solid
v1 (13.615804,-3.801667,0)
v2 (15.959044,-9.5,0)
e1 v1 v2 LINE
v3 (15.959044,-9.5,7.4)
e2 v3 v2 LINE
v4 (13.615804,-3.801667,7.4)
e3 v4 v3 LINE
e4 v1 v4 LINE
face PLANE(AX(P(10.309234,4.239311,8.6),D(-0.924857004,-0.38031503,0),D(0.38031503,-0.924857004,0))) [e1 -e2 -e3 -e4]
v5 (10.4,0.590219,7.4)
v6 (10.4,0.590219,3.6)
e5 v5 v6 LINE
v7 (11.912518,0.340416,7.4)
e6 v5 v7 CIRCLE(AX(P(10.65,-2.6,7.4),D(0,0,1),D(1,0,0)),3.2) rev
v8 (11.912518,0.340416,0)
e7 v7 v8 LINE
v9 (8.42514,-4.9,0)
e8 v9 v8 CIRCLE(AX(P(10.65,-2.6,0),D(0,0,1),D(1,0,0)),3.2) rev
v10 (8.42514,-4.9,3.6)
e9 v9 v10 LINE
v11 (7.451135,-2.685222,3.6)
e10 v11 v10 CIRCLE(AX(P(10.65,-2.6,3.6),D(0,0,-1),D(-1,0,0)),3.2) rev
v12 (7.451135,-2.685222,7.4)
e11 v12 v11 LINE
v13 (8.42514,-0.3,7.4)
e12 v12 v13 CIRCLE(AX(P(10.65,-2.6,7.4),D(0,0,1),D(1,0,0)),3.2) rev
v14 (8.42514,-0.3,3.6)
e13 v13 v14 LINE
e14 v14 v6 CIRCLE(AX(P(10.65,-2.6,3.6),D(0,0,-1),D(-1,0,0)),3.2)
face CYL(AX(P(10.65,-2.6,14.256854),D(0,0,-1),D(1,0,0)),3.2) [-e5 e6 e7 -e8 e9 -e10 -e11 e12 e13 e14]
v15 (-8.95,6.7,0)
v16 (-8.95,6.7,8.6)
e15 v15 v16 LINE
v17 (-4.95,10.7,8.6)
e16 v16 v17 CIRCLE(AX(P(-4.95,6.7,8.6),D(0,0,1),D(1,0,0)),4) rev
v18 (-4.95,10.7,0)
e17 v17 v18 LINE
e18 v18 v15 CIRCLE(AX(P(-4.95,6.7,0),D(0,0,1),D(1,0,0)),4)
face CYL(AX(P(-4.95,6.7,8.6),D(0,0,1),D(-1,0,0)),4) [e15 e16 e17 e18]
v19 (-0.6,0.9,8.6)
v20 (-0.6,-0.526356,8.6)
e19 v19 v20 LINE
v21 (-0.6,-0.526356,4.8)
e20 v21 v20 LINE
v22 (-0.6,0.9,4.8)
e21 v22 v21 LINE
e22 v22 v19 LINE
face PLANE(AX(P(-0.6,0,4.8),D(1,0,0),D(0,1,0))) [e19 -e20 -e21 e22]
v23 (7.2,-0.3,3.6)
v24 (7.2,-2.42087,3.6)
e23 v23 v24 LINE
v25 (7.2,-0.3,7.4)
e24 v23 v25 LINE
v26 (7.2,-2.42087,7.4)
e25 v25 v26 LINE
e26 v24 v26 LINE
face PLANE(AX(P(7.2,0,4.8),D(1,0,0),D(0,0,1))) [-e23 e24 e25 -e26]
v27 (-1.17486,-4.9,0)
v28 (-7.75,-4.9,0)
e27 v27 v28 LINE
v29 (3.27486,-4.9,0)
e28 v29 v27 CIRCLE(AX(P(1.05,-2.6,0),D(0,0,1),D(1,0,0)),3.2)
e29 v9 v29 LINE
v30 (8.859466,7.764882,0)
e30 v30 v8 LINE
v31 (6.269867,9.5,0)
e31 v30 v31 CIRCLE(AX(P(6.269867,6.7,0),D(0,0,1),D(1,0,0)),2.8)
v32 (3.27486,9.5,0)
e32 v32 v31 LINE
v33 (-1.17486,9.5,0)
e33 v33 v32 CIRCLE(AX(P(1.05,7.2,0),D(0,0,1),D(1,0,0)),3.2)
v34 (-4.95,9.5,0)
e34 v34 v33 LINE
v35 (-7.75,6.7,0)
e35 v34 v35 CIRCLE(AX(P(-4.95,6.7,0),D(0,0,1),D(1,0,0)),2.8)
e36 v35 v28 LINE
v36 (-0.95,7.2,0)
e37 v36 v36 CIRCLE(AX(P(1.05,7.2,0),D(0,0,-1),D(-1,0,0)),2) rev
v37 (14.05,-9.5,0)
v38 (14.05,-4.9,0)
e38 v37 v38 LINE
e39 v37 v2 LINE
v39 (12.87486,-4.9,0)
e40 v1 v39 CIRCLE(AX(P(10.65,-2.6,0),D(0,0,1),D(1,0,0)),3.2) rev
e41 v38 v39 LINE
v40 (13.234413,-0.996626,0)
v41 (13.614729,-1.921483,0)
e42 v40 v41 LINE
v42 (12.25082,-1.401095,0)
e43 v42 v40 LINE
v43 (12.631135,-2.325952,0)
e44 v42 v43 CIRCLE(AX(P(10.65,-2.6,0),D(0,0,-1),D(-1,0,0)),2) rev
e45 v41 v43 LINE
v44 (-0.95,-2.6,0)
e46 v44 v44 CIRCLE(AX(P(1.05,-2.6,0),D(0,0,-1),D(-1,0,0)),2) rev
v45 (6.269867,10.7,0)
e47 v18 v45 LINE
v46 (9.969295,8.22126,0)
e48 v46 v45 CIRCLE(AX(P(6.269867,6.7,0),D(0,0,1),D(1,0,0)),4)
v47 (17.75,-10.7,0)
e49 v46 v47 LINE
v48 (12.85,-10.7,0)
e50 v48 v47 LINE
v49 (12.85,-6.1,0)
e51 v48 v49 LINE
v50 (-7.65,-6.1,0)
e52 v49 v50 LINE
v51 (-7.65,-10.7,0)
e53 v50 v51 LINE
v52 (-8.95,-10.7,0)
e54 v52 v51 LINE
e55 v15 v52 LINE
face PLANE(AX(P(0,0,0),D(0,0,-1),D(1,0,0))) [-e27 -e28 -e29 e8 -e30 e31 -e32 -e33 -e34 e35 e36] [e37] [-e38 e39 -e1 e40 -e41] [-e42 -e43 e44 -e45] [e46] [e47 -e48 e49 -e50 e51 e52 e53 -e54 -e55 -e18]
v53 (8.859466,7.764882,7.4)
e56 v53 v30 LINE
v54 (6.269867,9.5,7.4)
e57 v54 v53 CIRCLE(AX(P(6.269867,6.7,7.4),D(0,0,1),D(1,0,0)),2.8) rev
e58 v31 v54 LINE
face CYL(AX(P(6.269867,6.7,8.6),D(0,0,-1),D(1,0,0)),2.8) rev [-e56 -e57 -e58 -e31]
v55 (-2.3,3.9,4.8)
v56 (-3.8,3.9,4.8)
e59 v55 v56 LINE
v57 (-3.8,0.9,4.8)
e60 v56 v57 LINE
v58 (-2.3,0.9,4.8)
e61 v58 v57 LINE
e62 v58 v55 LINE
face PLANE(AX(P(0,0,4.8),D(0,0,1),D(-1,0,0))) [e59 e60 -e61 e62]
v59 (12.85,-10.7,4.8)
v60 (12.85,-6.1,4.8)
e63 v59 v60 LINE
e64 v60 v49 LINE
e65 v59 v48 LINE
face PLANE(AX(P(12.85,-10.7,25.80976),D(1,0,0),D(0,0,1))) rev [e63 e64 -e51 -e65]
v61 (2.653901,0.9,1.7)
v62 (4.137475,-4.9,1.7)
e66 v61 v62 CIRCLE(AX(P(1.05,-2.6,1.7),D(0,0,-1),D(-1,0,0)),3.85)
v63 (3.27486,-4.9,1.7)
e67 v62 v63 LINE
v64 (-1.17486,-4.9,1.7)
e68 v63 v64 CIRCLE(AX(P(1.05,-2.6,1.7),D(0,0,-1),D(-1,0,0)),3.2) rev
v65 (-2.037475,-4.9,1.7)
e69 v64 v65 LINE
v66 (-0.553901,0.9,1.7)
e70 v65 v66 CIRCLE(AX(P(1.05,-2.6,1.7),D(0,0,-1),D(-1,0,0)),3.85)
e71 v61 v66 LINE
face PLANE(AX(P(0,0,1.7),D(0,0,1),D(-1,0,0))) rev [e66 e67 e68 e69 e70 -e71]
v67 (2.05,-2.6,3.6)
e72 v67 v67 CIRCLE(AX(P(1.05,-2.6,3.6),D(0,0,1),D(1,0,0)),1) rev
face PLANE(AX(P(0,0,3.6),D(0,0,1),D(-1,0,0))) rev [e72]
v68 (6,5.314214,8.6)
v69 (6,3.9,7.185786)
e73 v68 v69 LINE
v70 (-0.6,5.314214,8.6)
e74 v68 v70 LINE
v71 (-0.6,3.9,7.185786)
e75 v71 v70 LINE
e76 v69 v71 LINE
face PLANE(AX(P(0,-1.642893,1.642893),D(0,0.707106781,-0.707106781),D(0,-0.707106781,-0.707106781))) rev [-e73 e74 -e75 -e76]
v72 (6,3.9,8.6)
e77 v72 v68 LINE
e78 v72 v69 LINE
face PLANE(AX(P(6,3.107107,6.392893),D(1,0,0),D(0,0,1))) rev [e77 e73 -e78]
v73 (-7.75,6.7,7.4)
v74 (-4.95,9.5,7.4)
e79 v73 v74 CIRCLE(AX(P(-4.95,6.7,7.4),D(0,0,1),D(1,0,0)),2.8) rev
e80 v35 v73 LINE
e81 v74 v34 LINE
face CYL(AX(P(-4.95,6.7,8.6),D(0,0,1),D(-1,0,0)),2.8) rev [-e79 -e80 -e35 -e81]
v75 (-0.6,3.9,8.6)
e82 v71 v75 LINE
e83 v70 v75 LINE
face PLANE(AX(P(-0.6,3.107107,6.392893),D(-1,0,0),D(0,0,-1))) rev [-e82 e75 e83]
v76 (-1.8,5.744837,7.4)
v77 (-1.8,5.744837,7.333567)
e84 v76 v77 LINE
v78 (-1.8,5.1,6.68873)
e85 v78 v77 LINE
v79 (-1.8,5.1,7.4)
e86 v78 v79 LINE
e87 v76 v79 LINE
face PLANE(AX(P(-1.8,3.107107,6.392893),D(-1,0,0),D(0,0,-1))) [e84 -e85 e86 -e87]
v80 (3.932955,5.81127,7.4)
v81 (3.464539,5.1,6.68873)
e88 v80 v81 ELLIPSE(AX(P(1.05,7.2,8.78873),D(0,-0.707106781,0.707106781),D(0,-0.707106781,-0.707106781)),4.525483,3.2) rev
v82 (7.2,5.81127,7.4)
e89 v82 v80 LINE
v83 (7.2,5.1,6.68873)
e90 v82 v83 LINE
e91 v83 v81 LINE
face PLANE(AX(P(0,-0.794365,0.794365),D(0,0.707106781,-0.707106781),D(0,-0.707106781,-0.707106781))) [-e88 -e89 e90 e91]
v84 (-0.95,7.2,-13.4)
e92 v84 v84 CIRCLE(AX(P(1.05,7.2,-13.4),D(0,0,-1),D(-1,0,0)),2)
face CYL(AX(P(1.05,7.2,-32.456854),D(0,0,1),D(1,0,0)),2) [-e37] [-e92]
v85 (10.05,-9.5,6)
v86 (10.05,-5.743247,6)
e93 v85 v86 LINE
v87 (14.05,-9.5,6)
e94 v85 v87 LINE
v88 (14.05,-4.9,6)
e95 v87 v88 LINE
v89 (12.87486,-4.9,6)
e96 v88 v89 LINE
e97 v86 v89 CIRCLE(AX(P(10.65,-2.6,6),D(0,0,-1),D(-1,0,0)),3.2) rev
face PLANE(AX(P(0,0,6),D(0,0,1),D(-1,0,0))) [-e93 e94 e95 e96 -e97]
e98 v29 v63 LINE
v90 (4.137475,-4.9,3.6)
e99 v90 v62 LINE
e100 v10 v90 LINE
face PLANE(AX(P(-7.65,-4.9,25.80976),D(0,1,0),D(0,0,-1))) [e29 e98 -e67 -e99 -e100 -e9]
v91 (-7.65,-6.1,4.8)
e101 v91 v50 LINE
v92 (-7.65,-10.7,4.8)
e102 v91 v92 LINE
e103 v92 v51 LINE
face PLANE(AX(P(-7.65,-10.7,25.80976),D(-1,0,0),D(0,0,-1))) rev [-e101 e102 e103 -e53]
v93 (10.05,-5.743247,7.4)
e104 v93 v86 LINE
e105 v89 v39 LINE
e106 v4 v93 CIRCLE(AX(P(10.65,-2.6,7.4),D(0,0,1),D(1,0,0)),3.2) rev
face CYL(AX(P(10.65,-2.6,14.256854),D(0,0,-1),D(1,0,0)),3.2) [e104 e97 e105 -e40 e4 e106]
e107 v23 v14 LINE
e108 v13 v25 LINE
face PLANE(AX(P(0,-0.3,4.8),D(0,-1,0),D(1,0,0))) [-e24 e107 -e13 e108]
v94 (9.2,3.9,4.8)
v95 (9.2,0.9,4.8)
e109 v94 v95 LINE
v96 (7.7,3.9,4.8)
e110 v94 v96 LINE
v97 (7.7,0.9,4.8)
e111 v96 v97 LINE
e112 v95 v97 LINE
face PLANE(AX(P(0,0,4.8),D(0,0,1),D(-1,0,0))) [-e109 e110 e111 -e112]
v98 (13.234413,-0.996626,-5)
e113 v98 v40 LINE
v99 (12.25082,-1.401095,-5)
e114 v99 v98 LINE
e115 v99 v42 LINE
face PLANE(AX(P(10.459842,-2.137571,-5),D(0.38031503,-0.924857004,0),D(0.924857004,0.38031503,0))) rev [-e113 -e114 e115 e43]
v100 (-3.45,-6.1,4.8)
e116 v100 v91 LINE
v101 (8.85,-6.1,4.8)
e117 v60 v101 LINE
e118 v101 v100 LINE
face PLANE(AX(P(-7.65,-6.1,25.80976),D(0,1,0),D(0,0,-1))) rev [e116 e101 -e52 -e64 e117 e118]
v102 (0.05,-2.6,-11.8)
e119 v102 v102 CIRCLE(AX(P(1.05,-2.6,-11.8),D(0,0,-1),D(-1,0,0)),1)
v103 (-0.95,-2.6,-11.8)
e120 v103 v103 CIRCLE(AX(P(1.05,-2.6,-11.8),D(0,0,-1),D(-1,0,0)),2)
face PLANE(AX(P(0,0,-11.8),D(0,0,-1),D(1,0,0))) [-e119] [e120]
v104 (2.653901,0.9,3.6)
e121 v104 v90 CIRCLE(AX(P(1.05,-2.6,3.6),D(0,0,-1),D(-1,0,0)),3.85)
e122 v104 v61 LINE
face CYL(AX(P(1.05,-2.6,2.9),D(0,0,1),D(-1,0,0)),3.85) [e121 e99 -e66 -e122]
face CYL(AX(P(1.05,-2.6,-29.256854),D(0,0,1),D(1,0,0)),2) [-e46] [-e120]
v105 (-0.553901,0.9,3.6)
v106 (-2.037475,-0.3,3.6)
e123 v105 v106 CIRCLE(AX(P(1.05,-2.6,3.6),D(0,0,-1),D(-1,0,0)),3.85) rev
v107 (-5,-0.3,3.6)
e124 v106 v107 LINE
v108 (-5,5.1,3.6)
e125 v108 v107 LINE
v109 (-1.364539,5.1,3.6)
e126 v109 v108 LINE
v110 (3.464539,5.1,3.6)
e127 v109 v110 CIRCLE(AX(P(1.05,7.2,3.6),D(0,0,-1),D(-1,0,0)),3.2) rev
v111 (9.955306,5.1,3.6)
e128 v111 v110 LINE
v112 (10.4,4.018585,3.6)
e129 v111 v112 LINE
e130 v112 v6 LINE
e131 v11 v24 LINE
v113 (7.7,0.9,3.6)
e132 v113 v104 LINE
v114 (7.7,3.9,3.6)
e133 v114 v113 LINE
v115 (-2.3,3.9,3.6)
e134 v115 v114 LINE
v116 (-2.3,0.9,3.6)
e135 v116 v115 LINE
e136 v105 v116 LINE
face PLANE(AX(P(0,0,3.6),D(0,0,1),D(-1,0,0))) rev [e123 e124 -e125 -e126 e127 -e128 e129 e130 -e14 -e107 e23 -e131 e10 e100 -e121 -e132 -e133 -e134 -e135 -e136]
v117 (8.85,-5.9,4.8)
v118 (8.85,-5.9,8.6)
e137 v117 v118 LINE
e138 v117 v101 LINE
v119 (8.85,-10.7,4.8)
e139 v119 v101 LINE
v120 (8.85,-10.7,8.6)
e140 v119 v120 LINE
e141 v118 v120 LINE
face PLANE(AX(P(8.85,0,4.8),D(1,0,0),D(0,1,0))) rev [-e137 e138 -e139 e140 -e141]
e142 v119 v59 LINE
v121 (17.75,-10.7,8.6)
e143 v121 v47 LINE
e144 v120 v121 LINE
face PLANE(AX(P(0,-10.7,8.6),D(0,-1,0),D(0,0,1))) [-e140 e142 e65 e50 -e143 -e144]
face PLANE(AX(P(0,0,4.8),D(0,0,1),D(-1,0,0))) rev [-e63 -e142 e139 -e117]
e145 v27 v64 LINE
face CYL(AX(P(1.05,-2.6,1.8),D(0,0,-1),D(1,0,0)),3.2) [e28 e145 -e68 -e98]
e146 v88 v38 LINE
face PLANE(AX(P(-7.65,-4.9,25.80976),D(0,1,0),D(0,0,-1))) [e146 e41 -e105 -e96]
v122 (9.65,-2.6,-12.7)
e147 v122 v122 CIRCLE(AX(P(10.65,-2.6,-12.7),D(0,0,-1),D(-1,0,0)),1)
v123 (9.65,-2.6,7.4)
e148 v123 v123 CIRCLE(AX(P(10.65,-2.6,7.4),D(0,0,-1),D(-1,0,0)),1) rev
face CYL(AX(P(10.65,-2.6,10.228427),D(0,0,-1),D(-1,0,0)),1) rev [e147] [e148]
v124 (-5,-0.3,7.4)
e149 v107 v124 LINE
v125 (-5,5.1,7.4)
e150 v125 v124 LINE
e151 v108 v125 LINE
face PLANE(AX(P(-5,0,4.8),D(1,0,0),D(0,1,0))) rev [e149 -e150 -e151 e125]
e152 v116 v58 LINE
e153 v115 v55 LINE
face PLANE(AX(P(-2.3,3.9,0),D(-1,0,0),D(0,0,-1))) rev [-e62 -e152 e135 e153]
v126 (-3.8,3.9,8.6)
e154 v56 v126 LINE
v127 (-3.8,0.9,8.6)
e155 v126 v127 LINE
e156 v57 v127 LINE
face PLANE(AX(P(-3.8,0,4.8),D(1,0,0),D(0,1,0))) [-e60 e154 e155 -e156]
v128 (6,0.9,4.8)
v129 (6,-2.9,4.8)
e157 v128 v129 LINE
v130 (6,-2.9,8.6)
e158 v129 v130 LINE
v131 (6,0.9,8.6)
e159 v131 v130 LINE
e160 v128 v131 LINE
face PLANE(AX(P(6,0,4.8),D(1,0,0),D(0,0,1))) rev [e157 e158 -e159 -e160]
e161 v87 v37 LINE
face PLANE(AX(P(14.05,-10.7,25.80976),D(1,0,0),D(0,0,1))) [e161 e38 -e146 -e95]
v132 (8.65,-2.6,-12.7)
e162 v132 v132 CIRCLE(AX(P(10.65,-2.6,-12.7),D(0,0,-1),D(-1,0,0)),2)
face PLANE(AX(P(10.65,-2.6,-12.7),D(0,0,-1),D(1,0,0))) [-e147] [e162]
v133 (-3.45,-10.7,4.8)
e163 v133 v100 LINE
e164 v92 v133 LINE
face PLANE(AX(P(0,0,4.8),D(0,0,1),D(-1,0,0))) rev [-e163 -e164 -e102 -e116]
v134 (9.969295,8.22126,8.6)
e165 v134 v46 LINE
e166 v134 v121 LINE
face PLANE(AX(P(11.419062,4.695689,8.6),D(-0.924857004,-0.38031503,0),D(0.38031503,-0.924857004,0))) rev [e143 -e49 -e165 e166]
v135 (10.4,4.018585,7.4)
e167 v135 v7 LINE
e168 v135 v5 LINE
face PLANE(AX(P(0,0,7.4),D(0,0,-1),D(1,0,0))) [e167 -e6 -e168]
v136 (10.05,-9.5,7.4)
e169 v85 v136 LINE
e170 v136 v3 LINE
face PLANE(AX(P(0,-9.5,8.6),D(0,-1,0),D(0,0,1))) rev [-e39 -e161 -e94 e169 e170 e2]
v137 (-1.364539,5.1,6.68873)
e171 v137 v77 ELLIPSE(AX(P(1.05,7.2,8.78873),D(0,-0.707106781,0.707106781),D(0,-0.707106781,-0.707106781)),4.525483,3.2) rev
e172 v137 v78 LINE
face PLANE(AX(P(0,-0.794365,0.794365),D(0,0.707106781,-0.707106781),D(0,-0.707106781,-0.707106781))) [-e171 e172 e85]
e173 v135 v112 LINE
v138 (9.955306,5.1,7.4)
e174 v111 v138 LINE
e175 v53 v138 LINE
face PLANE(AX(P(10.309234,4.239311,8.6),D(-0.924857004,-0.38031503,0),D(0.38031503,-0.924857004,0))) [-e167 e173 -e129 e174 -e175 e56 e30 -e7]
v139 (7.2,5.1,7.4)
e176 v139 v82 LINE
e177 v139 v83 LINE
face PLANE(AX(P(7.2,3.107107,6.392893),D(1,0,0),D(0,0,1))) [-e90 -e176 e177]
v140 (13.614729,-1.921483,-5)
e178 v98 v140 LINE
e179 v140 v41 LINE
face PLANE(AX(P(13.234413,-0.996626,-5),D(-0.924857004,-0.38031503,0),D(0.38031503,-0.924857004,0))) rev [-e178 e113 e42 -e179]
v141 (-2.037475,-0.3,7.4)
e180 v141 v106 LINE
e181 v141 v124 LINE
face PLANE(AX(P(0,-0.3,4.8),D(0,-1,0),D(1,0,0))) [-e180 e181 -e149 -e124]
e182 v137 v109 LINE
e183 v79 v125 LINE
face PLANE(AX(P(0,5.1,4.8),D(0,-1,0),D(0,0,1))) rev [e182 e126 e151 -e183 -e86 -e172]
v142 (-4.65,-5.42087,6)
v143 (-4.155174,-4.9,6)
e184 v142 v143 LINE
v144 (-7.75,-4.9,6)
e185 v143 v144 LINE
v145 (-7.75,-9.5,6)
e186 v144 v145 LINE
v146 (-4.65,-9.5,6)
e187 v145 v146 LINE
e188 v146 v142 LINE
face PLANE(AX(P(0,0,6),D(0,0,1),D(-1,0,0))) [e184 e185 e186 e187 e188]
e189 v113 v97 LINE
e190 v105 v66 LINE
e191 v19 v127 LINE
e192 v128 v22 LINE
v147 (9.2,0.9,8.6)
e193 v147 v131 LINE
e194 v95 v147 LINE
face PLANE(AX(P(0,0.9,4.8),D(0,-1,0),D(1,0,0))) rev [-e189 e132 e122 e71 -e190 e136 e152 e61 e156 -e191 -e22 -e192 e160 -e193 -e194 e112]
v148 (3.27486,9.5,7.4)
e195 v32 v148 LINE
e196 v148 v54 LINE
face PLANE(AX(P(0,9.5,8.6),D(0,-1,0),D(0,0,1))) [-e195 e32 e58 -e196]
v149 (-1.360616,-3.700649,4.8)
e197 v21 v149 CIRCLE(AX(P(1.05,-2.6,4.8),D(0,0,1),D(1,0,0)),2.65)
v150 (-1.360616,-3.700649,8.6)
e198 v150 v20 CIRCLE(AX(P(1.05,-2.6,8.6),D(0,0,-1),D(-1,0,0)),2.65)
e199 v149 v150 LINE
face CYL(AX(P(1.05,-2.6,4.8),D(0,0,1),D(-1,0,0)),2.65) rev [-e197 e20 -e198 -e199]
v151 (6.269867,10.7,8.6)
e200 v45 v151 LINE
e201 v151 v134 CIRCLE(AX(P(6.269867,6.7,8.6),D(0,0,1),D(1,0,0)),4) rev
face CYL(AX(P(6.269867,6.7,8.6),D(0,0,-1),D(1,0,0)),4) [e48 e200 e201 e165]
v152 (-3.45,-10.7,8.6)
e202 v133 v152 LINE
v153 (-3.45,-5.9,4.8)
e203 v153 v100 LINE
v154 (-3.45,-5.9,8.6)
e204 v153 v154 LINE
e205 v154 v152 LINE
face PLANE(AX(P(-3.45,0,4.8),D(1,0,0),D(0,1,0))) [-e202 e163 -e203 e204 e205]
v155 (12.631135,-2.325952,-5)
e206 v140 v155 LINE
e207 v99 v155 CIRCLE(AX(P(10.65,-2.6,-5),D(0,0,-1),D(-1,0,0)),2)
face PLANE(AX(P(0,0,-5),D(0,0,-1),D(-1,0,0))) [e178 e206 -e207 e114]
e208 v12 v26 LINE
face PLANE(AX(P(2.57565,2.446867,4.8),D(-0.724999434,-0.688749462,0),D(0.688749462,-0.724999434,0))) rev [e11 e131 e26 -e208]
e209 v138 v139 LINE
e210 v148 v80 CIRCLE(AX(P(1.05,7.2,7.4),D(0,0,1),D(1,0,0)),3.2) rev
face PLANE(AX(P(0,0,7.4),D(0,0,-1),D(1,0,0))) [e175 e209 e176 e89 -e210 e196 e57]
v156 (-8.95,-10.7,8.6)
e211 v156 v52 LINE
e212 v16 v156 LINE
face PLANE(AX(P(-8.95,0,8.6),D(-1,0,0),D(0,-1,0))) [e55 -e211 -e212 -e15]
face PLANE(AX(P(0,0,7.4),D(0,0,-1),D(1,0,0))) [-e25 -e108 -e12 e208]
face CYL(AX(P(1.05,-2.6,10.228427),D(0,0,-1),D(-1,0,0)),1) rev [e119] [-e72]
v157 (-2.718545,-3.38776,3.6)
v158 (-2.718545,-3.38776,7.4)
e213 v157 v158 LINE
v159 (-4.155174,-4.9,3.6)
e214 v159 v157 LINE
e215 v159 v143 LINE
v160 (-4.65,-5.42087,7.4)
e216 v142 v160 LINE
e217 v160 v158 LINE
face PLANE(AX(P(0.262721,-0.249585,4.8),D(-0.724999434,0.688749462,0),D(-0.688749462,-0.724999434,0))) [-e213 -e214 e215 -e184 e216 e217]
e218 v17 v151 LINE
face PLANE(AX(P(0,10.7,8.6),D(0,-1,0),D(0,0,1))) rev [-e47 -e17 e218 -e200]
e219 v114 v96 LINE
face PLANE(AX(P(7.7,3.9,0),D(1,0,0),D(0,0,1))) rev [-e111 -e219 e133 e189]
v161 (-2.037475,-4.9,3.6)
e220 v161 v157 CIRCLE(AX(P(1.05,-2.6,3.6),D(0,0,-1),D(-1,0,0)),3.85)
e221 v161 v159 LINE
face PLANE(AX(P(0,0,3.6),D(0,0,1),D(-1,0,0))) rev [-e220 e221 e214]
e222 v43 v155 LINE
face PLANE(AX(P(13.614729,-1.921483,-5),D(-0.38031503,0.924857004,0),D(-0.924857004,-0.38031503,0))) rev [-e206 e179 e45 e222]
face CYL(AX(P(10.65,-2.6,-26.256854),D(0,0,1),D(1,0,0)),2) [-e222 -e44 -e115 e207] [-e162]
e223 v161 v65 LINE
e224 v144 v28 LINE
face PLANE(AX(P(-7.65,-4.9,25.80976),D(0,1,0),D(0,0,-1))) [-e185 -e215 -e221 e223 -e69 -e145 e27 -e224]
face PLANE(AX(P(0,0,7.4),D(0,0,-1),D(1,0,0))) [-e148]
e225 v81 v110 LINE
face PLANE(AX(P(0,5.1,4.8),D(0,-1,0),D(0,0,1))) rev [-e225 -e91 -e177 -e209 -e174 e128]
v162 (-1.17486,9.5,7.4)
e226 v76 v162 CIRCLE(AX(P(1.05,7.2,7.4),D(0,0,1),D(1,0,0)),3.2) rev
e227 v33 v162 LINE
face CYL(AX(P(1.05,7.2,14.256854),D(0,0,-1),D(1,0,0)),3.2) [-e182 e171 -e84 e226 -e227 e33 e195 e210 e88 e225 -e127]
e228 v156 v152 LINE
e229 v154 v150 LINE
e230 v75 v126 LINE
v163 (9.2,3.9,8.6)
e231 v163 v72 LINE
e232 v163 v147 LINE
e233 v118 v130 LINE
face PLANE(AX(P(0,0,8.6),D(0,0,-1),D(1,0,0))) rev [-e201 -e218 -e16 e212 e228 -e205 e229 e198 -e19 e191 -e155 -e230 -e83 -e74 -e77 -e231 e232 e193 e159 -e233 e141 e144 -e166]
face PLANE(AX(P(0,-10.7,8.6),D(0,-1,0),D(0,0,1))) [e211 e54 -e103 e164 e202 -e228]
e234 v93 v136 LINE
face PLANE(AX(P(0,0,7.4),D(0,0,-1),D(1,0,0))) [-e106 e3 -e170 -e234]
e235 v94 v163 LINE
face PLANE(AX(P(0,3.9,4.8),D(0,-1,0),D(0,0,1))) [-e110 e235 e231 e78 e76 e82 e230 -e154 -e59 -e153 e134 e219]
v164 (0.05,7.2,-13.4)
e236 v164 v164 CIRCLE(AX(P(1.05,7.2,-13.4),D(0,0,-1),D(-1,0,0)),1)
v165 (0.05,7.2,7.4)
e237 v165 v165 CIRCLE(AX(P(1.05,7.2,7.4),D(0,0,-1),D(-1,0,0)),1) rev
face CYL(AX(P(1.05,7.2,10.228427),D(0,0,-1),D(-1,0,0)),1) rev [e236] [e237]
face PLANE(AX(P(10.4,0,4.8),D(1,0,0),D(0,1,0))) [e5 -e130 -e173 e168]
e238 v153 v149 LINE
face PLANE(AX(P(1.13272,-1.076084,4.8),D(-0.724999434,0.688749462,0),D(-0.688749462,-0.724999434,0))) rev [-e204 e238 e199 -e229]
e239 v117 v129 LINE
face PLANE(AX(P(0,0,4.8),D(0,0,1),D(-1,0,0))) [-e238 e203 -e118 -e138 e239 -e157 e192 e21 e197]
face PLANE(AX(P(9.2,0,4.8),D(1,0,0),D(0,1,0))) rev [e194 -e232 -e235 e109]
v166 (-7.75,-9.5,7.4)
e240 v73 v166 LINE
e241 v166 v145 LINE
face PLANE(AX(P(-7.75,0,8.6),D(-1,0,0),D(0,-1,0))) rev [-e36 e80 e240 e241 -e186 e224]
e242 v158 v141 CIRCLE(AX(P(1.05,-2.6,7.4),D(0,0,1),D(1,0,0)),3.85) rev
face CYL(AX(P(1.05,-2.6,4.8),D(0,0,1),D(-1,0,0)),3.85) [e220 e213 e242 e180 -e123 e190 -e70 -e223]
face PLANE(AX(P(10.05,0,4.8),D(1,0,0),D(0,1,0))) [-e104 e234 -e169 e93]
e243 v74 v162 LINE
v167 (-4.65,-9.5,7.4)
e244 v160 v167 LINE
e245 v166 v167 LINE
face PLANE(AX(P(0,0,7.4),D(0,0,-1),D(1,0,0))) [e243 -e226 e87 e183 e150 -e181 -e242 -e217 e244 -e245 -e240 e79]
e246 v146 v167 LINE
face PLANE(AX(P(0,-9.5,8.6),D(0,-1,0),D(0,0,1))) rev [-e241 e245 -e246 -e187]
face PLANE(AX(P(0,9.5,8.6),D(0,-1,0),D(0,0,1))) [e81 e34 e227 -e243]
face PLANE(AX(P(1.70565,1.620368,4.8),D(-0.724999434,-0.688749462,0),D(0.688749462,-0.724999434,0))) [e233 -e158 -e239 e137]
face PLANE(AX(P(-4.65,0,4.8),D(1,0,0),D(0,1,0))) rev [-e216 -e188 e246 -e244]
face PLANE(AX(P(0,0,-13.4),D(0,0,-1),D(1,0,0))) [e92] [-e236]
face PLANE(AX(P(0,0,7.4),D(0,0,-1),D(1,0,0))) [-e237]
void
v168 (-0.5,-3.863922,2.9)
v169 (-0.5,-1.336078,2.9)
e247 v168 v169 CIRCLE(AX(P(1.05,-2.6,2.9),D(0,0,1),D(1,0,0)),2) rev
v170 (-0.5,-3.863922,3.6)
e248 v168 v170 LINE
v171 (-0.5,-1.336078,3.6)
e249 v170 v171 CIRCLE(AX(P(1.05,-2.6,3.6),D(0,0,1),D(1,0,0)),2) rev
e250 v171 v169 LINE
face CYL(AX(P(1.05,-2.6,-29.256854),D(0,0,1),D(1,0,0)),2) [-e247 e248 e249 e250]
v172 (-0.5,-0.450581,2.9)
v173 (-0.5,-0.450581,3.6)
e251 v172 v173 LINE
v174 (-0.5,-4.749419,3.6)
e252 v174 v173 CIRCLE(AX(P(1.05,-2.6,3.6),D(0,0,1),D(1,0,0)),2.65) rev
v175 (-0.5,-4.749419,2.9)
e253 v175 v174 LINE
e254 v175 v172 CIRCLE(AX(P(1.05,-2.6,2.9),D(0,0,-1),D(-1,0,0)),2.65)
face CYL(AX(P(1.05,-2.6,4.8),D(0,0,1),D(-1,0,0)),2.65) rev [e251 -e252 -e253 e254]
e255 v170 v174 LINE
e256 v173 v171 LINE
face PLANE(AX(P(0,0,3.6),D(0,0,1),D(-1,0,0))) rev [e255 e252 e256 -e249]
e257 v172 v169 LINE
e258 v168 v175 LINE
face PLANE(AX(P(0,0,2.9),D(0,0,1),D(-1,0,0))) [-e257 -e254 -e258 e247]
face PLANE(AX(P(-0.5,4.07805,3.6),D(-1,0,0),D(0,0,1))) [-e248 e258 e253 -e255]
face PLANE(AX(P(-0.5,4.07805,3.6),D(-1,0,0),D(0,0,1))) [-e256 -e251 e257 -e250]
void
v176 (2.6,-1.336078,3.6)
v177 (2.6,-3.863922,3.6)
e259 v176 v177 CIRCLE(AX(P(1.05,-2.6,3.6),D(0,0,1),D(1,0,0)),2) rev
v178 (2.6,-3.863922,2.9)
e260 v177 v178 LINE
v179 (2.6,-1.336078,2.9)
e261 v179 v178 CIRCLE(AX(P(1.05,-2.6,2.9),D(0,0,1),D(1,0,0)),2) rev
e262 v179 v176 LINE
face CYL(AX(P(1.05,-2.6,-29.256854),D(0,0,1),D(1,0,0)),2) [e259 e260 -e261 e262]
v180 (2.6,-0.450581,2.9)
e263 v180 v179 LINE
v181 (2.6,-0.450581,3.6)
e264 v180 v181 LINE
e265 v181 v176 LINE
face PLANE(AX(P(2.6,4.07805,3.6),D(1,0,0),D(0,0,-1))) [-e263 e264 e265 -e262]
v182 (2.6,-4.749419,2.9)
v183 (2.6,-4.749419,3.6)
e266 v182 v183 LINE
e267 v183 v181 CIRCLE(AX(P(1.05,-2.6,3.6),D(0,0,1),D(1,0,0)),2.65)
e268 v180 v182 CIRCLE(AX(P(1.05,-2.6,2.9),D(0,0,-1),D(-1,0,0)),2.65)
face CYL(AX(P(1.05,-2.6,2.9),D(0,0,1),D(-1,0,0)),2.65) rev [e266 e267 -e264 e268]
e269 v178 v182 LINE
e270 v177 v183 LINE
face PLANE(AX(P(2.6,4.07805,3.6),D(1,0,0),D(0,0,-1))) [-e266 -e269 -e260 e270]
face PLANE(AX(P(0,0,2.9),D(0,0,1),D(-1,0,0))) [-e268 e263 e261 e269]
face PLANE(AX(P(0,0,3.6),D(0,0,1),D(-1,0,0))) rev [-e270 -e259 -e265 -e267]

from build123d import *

# Parameters (mm, degrees)
SKETCH1_W           = 17.9
SKETCH1_H           = 21.4
SKETCH1_R           = 1
BOSS_EXTRUDE1_DEPTH = 8.6
FILLET1_R           = 4
SKETCH2_R           = 2
CUT_EXTRUDE1_DEPTH  = 1.8
CUT_EXTRUDE2_START  = -3.8
SKETCH4_R           = 2.65
SKETCH4_W           = 6.6
SKETCH4_H           = 3.8
SKETCH4_W_2         = 12.3
SKETCH4_H_2         = 4.8
CUT_EXTRUDE2_DEPTH  = 3.8
SKETCH5_W           = 10
SKETCH5_H           = 3
CUT_EXTRUDE3_DEPTH  = 22.27422149
CUT_EXTRUDE4_START  = -1.9
SKETCH6_R           = 1
CUT_EXTRUDE4_DEPTH  = 1.9
SKETCH7_W           = 20.5
SKETCH7_H           = 4.6
CUT_EXTRUDE5_DEPTH  = 4.8
SKETCH9_W           = 6.6
SKETCH9_H           = 5
CUT_EXTRUDE6_DEPTH  = 1
SKETCH3_R           = 2
CUT_EXTRUDE7_DEPTH  = 7.4
SKETCH10_R          = 3
BOSS_EXTRUDE2_DEPTH = 4.8
SKETCH11_R          = 2
CUT_EXTRUDE8_DEPTH  = 12.2
SHELL1_START        = -6.688730163
SHELL1_DEPTH        = 6.688730163
SHELL1_START_2      = -3.6
SHELL1_2_OUTLINE_W  = 1.5
SHELL1_2_OUTLINE_H  = 5.4
SHELL1_2_DEPTH      = 3.6
SHELL1_START_3      = -7.4
SHELL1_3_DEPTH      = 1.4
SHELL1_START_4      = -1.7
SHELL1_4_DEPTH      = 1.7
SHELL1_5_DEPTH      = 0.711269837
SHELL1_START_5      = -7.333566942
SHELL1_6_DEPTH      = 0.644836779
SHELL1_START_6      = 3.274859546
SHELL1_7_DEPTH      = 3.925140454
SHELL1_START_7      = -1.8
SHELL1_8_DEPTH      = 0.435460706
CUT_EXTRUDE9_START  = -3.6
CUT_EXTRUDE9_DEPTH  = 3.6
CUT_EXTRUDE10_START = -1.7
CUT_EXTRUDE10_DEPTH = 1.7
BOSS_EXTRUDE3_DEPTH = 1.2
SKETCH18_R          = 2
BOSS_EXTRUDE4_DEPTH = 20.8
SKETCH19_R          = 2
BOSS_EXTRUDE5_DEPTH = 15.4
SKETCH20_R          = 2
BOSS_EXTRUDE6_DEPTH = 20.1
CUT_EXTRUDE11_START = -4.8
SKETCH21_R          = 3
SKETCH21_R_2        = 2
CUT_EXTRUDE11_DEPTH = 4.8
BOSS_EXTRUDE7_DEPTH = 5
BOSS_EXTRUDE8_START = -7
SKETCH23_W          = 3.1
SKETCH23_H          = 0.7
BOSS_EXTRUDE8_DEPTH = 7
CUT_EXTRUDE12_REACH = 32.225
SKETCH24_R          = 1
SKETCH25_R          = 1
BOSS_EXTRUDE9_DEPTH = 1.2


with BuildPart() as part:
    # Sketch1 → Boss-Extrude1 (new body)
    # profile 1 of 2: a face of its own
    with BuildSketch(Plane.XY):
        Rectangle(SKETCH1_W, SKETCH1_H)
        with Locations((1.05, -2.6)):
            Circle(SKETCH1_R, mode=Mode.SUBTRACT)
    # profile 2 of 2: a face of its own
    with BuildSketch(Plane.XY):
        Polygon((17.75, -10.7), (8.95, -10.7), (8.95, 10.7), align=None)
    extrude(amount=-BOSS_EXTRUDE1_DEPTH)

    # Fillet1
    fillet1_edges = [part.edges().sort_by_distance(p)[0] for p in [
        (-8.95, 10.7, -4.3),
        (8.95, 10.7, -4.3),
    ]]
    fillet(fillet1_edges, radius=FILLET1_R)

    # Sketch2 → Cut-Extrude1 (cut)
    with BuildSketch(Plane.XY):
        with Locations((1.05, -2.6)):
            Circle(SKETCH2_R)
    extrude(amount=-CUT_EXTRUDE1_DEPTH, mode=Mode.SUBTRACT)

    # Sketch4 → Cut-Extrude2 (cut)
    with BuildSketch(Plane(origin=(0, 0, -8.6), x_dir=(-1, 0, 0), z_dir=(0, 0, -1)).offset(CUT_EXTRUDE2_START)):
        Polygon((-9.2, 0.9), (-6, 0.9), (0.6, 0.9), (3.8, 0.9), (3.8, 3.9), (-9.2, 3.9), align=None)
        with Locations((-1.05, -2.6)):
            Circle(SKETCH4_R)
        with Locations((-2.7, -1)):
            Rectangle(SKETCH4_W, SKETCH4_H)
        with BuildLine():
            ThreePointArc((0.6, -0.526355865), (-2.334562661, -0.28215644), (-3.682964109, -2.9))
            Line((-3.682964109, -2.9), (-2.003939201, -2.9))
            ThreePointArc((-2.003939201, -2.9), (-1.201757699, -1.611582274), (-0.05, -2.6))
            ThreePointArc((-0.05, -2.6), (-0.061582274, -2.751757699), (-0.096060799, -2.9))
            Line((-0.096060799, -2.9), (0.6, -2.9))
            Line((0.6, -2.9), (0.6, -0.526355865))
        make_face()
        with BuildLine():
            Line((-2.003939201, -2.9), (-3.682964109, -2.9))
            ThreePointArc((-3.682964109, -2.9), (-1.465474787, -5.217227675), (1.360616498, -3.700648945))
            Line((1.360616498, -3.700648945), (0.6, -2.9))
            Line((0.6, -2.9), (-0.096060799, -2.9))
            ThreePointArc((-0.096060799, -2.9), (-1.05, -3.6), (-2.003939201, -2.9))
        make_face()
        with BuildLine():
            Line((0.6, -2.9), (1.360616498, -3.700648945))
            ThreePointArc((1.360616498, -3.700648945), (1.539462658, -3.163190146), (1.6, -2.6))
            ThreePointArc((1.6, -2.6), (1.336943652, -1.448913557), (0.6, -0.526355865))
            Line((0.6, -0.526355865), (0.6, -2.9))
        make_face()
        Polygon((-6, -2.9), (0.6, -2.9), (3.45, -5.9), (-8.85, -5.9), align=None)
        with Locations((-2.7, -8.3)):
            Rectangle(SKETCH4_W_2, SKETCH4_H_2)
    extrude(amount=CUT_EXTRUDE2_DEPTH, mode=Mode.SUBTRACT)

    # Sketch5 → Cut-Extrude3 (cut, through all)
    with BuildSketch(Plane(origin=(0, 0, -4.8), x_dir=(-1, 0, 0), z_dir=(0, 0, -1))):
        with Locations((-2.7, 2.4)):
            Rectangle(SKETCH5_W, SKETCH5_H)
    extrude(amount=-CUT_EXTRUDE3_DEPTH, mode=Mode.SUBTRACT)

    # Sketch6 → Cut-Extrude4 (cut)
    # profile 1 of 5: a face of its own
    with BuildSketch(Plane(origin=(0, 0, -4.8), x_dir=(-1, 0, 0), z_dir=(0, 0, -1)).offset(CUT_EXTRUDE4_START)):
        with BuildLine():
            ThreePointArc((-2.6, -0.450581474), (-3.7, -2.6), (-2.6, -4.749418526))
            Line((-2.6, -4.749418526), (-2.6, -0.450581474))
        make_face()
    # profile 2 of 5: a face of its own
    with BuildSketch(Plane(origin=(0, 0, -4.8), x_dir=(-1, 0, 0), z_dir=(0, 0, -1)).offset(CUT_EXTRUDE4_START)):
        with BuildLine():
            Line((-2.6, -0.450581474), (-2.6, -4.749418526))
            ThreePointArc((-2.6, -4.749418526), (-1.05, -5.25), (0.5, -4.749418526))
            Line((0.5, -4.749418526), (0.5, -0.450581474))
            ThreePointArc((0.5, -0.450581474), (-1.05, 0.05), (-2.6, -0.450581474))
        make_face()
        with Locations(Location((-1.05, -2.6, 0), (0, 0, 180))):
            Circle(SKETCH6_R, mode=Mode.SUBTRACT)
    # profile 3 of 5: a face of its own
    with BuildSketch(Plane(origin=(0, 0, -4.8), x_dir=(-1, 0, 0), z_dir=(0, 0, -1)).offset(CUT_EXTRUDE4_START)):
        with BuildLine():
            Line((-2.6, 0.9), (-2.6, -0.450581474))
            ThreePointArc((-2.6, -0.450581474), (-1.05, 0.05), (0.5, -0.450581474))
            Line((0.5, -0.450581474), (0.5, 0.9))
            Line((0.5, 0.9), (-2.6, 0.9))
        make_face()
    # profile 4 of 5: a face of its own
    with BuildSketch(Plane(origin=(0, 0, -4.8), x_dir=(-1, 0, 0), z_dir=(0, 0, -1)).offset(CUT_EXTRUDE4_START)):
        with BuildLine():
            Line((0.5, -0.450581474), (0.5, -4.749418526))
            ThreePointArc((0.5, -4.749418526), (0.998560511, -4.281041294), (1.360616498, -3.700648945))
            ThreePointArc((1.360616498, -3.700648945), (1.539462658, -3.163190146), (1.6, -2.6))
            ThreePointArc((1.6, -2.6), (1.336943652, -1.448913557), (0.6, -0.526355865))
            ThreePointArc((0.6, -0.526355865), (0.550448512, -0.487876765), (0.5, -0.450581474))
        make_face()
    # profile 5 of 5: a face of its own
    with BuildSketch(Plane(origin=(0, 0, -4.8), x_dir=(-1, 0, 0), z_dir=(0, 0, -1)).offset(CUT_EXTRUDE4_START)):
        with BuildLine():
            Line((-2.6, -4.749418526), (-2.6, -6.1))
            Line((-2.6, -6.1), (0.5, -6.1))
            Line((0.5, -6.1), (0.5, -4.749418526))
            ThreePointArc((0.5, -4.749418526), (-1.05, -5.25), (-2.6, -4.749418526))
        make_face()
    extrude(amount=CUT_EXTRUDE4_DEPTH, mode=Mode.SUBTRACT)

    # Sketch7 → Cut-Extrude5 (cut)
    with BuildSketch(Plane.XY):
        with Locations((2.6, -8.4)):
            Rectangle(SKETCH7_W, SKETCH7_H)
    extrude(amount=-CUT_EXTRUDE5_DEPTH, mode=Mode.SUBTRACT)

    # Sketch9 → Cut-Extrude6 (cut)
    with BuildSketch(Plane(origin=(0, -2.35, -2.35), x_dir=(-1, 0, 0), z_dir=(0, -0.7071067811865561, -0.7071067811865389))):
        with Locations((-2.7, 9.217514421)):
            Rectangle(SKETCH9_W, SKETCH9_H)
    extrude(amount=-CUT_EXTRUDE6_DEPTH, mode=Mode.SUBTRACT)

    # Sketch3 → Cut-Extrude7 (cut)
    with BuildSketch(Plane.XY):
        with Locations((1.05, 7.2)):
            Circle(SKETCH3_R)
    extrude(amount=-CUT_EXTRUDE7_DEPTH, mode=Mode.SUBTRACT)

    # Sketch10 → Boss-Extrude2 (add)
    with BuildSketch(Plane.XY):
        with Locations((10.65, -2.6)):
            Circle(SKETCH10_R)
    extrude(amount=BOSS_EXTRUDE2_DEPTH)

    # Sketch11 → Cut-Extrude8 (cut)
    with BuildSketch(Plane.XY.offset(4.8)):
        with Locations((10.65, -2.6)):
            Circle(SKETCH11_R)
    extrude(amount=-CUT_EXTRUDE8_DEPTH, mode=Mode.SUBTRACT)

    # Shell1: read off the stored shape, not the designer's step
    # Shell1 outline → Shell1 (cut)
    with BuildSketch(Plane.XY.offset(SHELL1_START)):
        with BuildLine():
            Line((8.425140454, -0.3), (7.2, -0.3))
            Line((7.2, -0.3), (7.2, -2.420869782))
            Line((7.2, -2.420869782), (7.451135024, -2.685222439))
            ThreePointArc((7.451135024, -2.685222439), (7.687481064, -1.390255582), (8.425140454, -0.3))
        make_face()
        with BuildLine():
            Line((-4.155173707, -4.9), (-2.718545428, -3.387759707))
            ThreePointArc((-2.718545428, -3.387759707), (-2.709630033, -1.770734053), (-2.037474696, -0.3))
            Line((-2.037474696, -0.3), (-5, -0.3))
            Line((-5, -0.3), (-5, 5.1))
            Line((-5, 5.1), (-1.364539294, 5.1))
            ThreePointArc((-1.364539294, 5.1), (-2.147030716, 7.337820904), (-1.174859546, 9.5))
            Line((-1.174859546, 9.5), (-4.95, 9.5))
            ThreePointArc((-4.95, 9.5), (-6.929898987, 8.679898987), (-7.75, 6.7))
            Line((-7.75, 6.7), (-7.75, -4.9))
            Line((-7.75, -4.9), (-4.155173707, -4.9))
        make_face()
        with BuildLine():
            Line((12.874859546, -4.9), (14.05, -4.9))
            Line((14.05, -4.9), (14.05, -9.5))
            Line((14.05, -9.5), (15.959044178, -9.5))
            Line((15.959044178, -9.5), (13.615804478, -3.801667092))
            ThreePointArc((13.615804478, -3.801667092), (13.302797023, -4.389599942), (12.874859546, -4.9))
        make_face()
        with BuildLine():
            ThreePointArc((10.4, 0.590219428), (11.17143883, 0.557230043), (11.912517793, 0.340416437))
            Line((11.912517793, 0.340416437), (10.4, 4.018584707))
            Line((10.4, 4.018584707), (10.4, 0.590219428))
        make_face()
        with BuildLine():
            Line((7.2, 5.1), (9.955305861, 5.1))
            Line((9.955305861, 5.1), (8.859466499, 7.764882083))
            ThreePointArc((8.859466499, 7.764882083), (7.828444792, 9.026120142), (6.269866888, 9.5))
            Line((6.269866888, 9.5), (3.274859546, 9.5))
            ThreePointArc((3.274859546, 9.5), (4.247030716, 7.337820904), (3.464539294, 5.1))
            Line((3.464539294, 5.1), (7.2, 5.1))
        make_face()
    extrude(amount=SHELL1_DEPTH, mode=Mode.SUBTRACT)

    # Shell1 2 outline → Shell1 2 (cut)
    with BuildSketch(Plane.XY.offset(SHELL1_START_2)):
        with BuildLine():
            Line((7.2, -0.3), (4.137474696, -0.3))
            ThreePointArc((4.137474696, -0.3), (4.9, -2.6), (4.137474696, -4.9))
            Line((4.137474696, -4.9), (8.425140454, -4.9))
            ThreePointArc((8.425140454, -4.9), (7.720749783, -3.888213168), (7.451135024, -2.685222439))
            Line((7.451135024, -2.685222439), (7.2, -2.420869782))
            Line((7.2, -2.420869782), (7.2, -0.3))
        make_face()
        with BuildLine():
            Line((-4.155173707, -4.9), (-2.037474696, -4.9))
            ThreePointArc((-2.037474696, -4.9), (-2.460408902, -4.180989987), (-2.718545428, -3.387759707))
            Line((-2.718545428, -3.387759707), (-4.155173707, -4.9))
        make_face()
        with Locations((-4.25, 2.4)):
            Rectangle(SHELL1_2_OUTLINE_W, SHELL1_2_OUTLINE_H)
        with BuildLine():
            ThreePointArc((8.9, 0.079085665), (9.617859297, 0.428974342), (10.4, 0.590219428))
            Line((10.4, 0.590219428), (10.4, 4.018584707))
            Line((10.4, 4.018584707), (9.95530586, 5.1))
            Line((9.95530586, 5.1), (8.9, 5.1))
            Line((8.9, 5.1), (8.9, 0.079085665))
        make_face()
    extrude(amount=SHELL1_2_DEPTH, mode=Mode.SUBTRACT)

    # Shell1 3 outline → Shell1 3 (cut)
    with BuildSketch(Plane.XY.offset(SHELL1_START_3)):
        with BuildLine():
            Line((8.425140454, -0.3), (7.2, -0.3))
            Line((7.2, -0.3), (7.2, -2.420869782))
            Line((7.2, -2.420869782), (7.451135024, -2.685222439))
            ThreePointArc((7.451135024, -2.685222439), (7.687481064, -1.390255582), (8.425140454, -0.3))
        make_face()
        with BuildLine():
            ThreePointArc((-2.718545428, -3.387759707), (-2.709630033, -1.770734053), (-2.037474696, -0.3))
            Line((-2.037474696, -0.3), (-5, -0.3))
            Line((-5, -0.3), (-5, 5.1))
            Line((-5, 5.1), (-1.8, 5.1))
            Line((-1.8, 5.1), (-1.8, 5.744836779))
            ThreePointArc((-1.8, 5.744836779), (-2.106558657, 7.725487814), (-1.174859546, 9.5))
            Line((-1.174859546, 9.5), (-4.95, 9.5))
            ThreePointArc((-4.95, 9.5), (-6.929898987, 8.679898987), (-7.75, 6.7))
            Line((-7.75, 6.7), (-7.75, -9.5))
            Line((-7.75, -9.5), (-4.65, -9.5))
            Line((-4.65, -9.5), (-4.65, -5.420869782))
            Line((-4.65, -5.420869782), (-2.718545428, -3.387759707))
        make_face()
        with BuildLine():
            Line((10.05, -9.5), (15.959044178, -9.5))
            Line((15.959044178, -9.5), (13.615804478, -3.801667092))
            ThreePointArc((13.615804478, -3.801667092), (12.180258337, -5.410393108), (10.05, -5.743246729))
            Line((10.05, -5.743246729), (10.05, -9.5))
        make_face()
        with BuildLine():
            ThreePointArc((10.4, 0.590219428), (11.17143883, 0.557230043), (11.912517793, 0.340416437))
            Line((11.912517793, 0.340416437), (10.4, 4.018584707))
            Line((10.4, 4.018584707), (10.4, 0.590219428))
        make_face()
    extrude(amount=SHELL1_3_DEPTH, mode=Mode.SUBTRACT)

    # Shell1 4 outline → Shell1 4 (cut)
    with BuildSketch(Plane.XY.offset(SHELL1_START_4)):
        with BuildLine():
            ThreePointArc((4.137474696, -4.9), (4.9, -2.6), (4.137474696, -0.3))
            Line((4.137474696, -0.3), (3.274859546, -0.3))
            ThreePointArc((3.274859546, -0.3), (4.25, -2.6), (3.274859546, -4.9))
            Line((3.274859546, -4.9), (4.137474696, -4.9))
        make_face()
        with BuildLine():
            ThreePointArc((-2.037474696, -0.3), (-2.8, -2.6), (-2.037474696, -4.9))
            Line((-2.037474696, -4.9), (-1.174859546, -4.9))
            ThreePointArc((-1.174859546, -4.9), (-2.15, -2.6), (-1.174859546, -0.3))
            Line((-1.174859546, -0.3), (-2.037474696, -0.3))
        make_face()
    extrude(amount=SHELL1_4_DEPTH, mode=Mode.SUBTRACT)

    # Shell1 5 outline → Shell1 5 (cut)
    with BuildSketch(Plane.XY.offset(SHELL1_START_3)):
        with BuildLine():
            Line((9.95530586, 5.1), (8.859466499, 7.764882083))
            ThreePointArc((8.859466499, 7.764882083), (7.828444792, 9.026120142), (6.269866888, 9.5))
            Line((6.269866888, 9.5), (3.274859546, 9.5))
            ThreePointArc((3.274859546, 9.5), (4.247030716, 7.337820904), (3.464539294, 5.1))
            Line((3.464539294, 5.1), (7.2, 5.1))
            Line((7.2, 5.1), (9.95530586, 5.1))
        make_face()
    extrude(amount=SHELL1_5_DEPTH, mode=Mode.SUBTRACT)

    # Shell1 6 outline → Shell1 6 (cut)
    with BuildSketch(Plane.XY.offset(SHELL1_START_5)):
        with BuildLine():
            ThreePointArc((-1.364539294, 5.1), (-1.60194214, 5.409133481), (-1.8, 5.744836779))
            Line((-1.8, 5.744836779), (-1.8, 5.1))
            Line((-1.8, 5.1), (-1.364539294, 5.1))
        make_face()
    extrude(amount=SHELL1_6_DEPTH, mode=Mode.SUBTRACT)

    # Shell1 7 outline → Shell1 7 (add)
    with BuildSketch(Plane.YZ.offset(SHELL1_START_6)):
        Polygon((5.1, -7.4), (5.811269837, -7.4), (5.1, -6.688730163), align=None)
    extrude(amount=SHELL1_7_DEPTH)

    # Shell1 8 outline → Shell1 8 (add)
    with BuildSketch(Plane.YZ.offset(SHELL1_START_7)):
        Polygon((5.1, -7.333566942), (5.744836779, -7.333566942), (5.1, -6.688730163), align=None)
    extrude(amount=SHELL1_8_DEPTH)

    # Cut-Extrude9: read off the stored shape, not the designer's step
    # Cut-Extrude9 outline → Cut-Extrude9 (cut)
    with BuildSketch(Plane.XY.offset(CUT_EXTRUDE9_START)):
        with BuildLine():
            Line((7.7, 0.9), (2.653901493, 0.9))
            ThreePointArc((2.653901493, 0.9), (3.471208921, 0.393367228), (4.137474696, -0.3))
            Line((4.137474696, -0.3), (8.425140454, -0.3))
            ThreePointArc((8.425140454, -0.3), (8.653552258, -0.099160859), (8.9, 0.079085665))
            Line((8.9, 0.079085665), (8.9, 5.1))
            Line((8.9, 5.1), (3.464539294, 5.1))
            ThreePointArc((3.464539294, 5.1), (1.05, 4), (-1.364539294, 5.1))
            Line((-1.364539294, 5.1), (-3.5, 5.1))
            Line((-3.5, 5.1), (-3.5, -0.3))
            Line((-3.5, -0.3), (-2.037474696, -0.3))
            ThreePointArc((-2.037474696, -0.3), (-1.371208921, 0.393367228), (-0.553901493, 0.9))
            Line((-0.553901493, 0.9), (-2.3, 0.9))
            Line((-2.3, 0.9), (-2.3, 3.9))
            Line((-2.3, 3.9), (7.7, 3.9))
            Line((7.7, 3.9), (7.7, 0.9))
        make_face()
    extrude(amount=CUT_EXTRUDE9_DEPTH, mode=Mode.SUBTRACT)

    # Sketch15 → Cut-Extrude10 (cut)
    with BuildSketch(Plane.XY.offset(CUT_EXTRUDE10_START)):
        with BuildLine():
            ThreePointArc((-0.553901493, 0.9), (-1.371208921, 0.393367228), (-2.037474696, -0.3))
            Line((-2.037474696, -0.3), (-1.174859546, -0.3))
            ThreePointArc((-1.174859546, -0.3), (1.05, 0.6), (3.274859546, -0.3))
            Line((3.274859546, -0.3), (4.137474696, -0.3))
            ThreePointArc((4.137474696, -0.3), (3.471208921, 0.393367228), (2.653901493, 0.9))
            Line((2.653901493, 0.9), (-0.553901493, 0.9))
        make_face()
    extrude(amount=CUT_EXTRUDE10_DEPTH, mode=Mode.SUBTRACT)


with BuildPart() as body_2:
    # Mirror1: mirrored copy
    add(part.part.mirror(Plane.XY))

    # Sketch16 → Boss-Extrude3 (add)
    with BuildSketch(Plane.XY.offset(4.8)):
        with BuildLine():
            ThreePointArc((2.6, -0.450581474), (1.05, 0.05), (-0.5, -0.450581474))
            Line((-0.5, -0.450581474), (-0.5, -4.749418526))
            ThreePointArc((-0.5, -4.749418526), (1.05, -5.25), (2.6, -4.749418526))
            Line((2.6, -4.749418526), (2.6, -0.450581474))
        make_face()
        with BuildLine():
            Line((-0.5, -4.749418526), (-0.5, -0.450581474))
            ThreePointArc((-0.5, -0.450581474), (-1.6, -2.6), (-0.5, -4.749418526))
        make_face()
        with BuildLine():
            Line((2.6, 0.9), (-0.5, 0.9))
            Line((-0.5, 0.9), (-0.5, -0.450581474))
            ThreePointArc((-0.5, -0.450581474), (1.05, 0.05), (2.6, -0.450581474))
            Line((2.6, -0.450581474), (2.6, 0.9))
        make_face()
        with BuildLine():
            ThreePointArc((3.7, -2.6), (3.409025222, -1.392730353), (2.6, -0.450581474))
            Line((2.6, -0.450581474), (2.6, -4.749418526))
            ThreePointArc((2.6, -4.749418526), (3.409025222, -3.807269647), (3.7, -2.6))
        make_face()
        with BuildLine():
            ThreePointArc((2.6, -4.749418526), (1.05, -5.25), (-0.5, -4.749418526))
            Line((-0.5, -4.749418526), (-0.5, -6.1))
            Line((-0.5, -6.1), (2.6, -6.1))
            Line((2.6, -6.1), (2.6, -4.749418526))
        make_face()
    extrude(amount=-BOSS_EXTRUDE3_DEPTH)

    # Sketch18 → Boss-Extrude4 (add)
    with BuildSketch(Plane(origin=(0, 0, 7.4), x_dir=(-1, 0, 0), z_dir=(0, 0, -1))):
        with Locations((-1.05, 7.2)):
            Circle(SKETCH18_R)
    extrude(amount=BOSS_EXTRUDE4_DEPTH)

    # Sketch19 → Boss-Extrude5 (add)
    with BuildSketch(Plane(origin=(0, 0, 3.6), x_dir=(-1, 0, 0), z_dir=(0, 0, -1))):
        with Locations(Location((-1.05, -2.6, 0), (0, 0, 180))):
            Circle(SKETCH19_R)
    extrude(amount=BOSS_EXTRUDE5_DEPTH)

    # Sketch20 → Boss-Extrude6 (add)
    with BuildSketch(Plane(origin=(0, 0, 7.4), x_dir=(-1, 0, 0), z_dir=(0, 0, -1))):
        with Locations((-10.65, -2.6)):
            Circle(SKETCH20_R)
    extrude(amount=BOSS_EXTRUDE6_DEPTH)

    # Sketch21 → Cut-Extrude11 (cut)
    with BuildSketch(Plane(origin=(0, 0, -4.8), x_dir=(-1, 0, 0), z_dir=(0, 0, -1)).offset(CUT_EXTRUDE11_START)):
        with Locations((-10.65, -2.6)):
            Circle(SKETCH21_R)
        with Locations((-10.65, -2.6)):
            Circle(SKETCH21_R_2, mode=Mode.SUBTRACT)
    extrude(amount=CUT_EXTRUDE11_DEPTH, mode=Mode.SUBTRACT)

    # Sketch22 → Boss-Extrude7 (add)
    with BuildSketch(Plane(origin=(0, 0, 0), x_dir=(-1, 0, 0), z_dir=(0, 0, -1))):
        Polygon((-13.614728527, -1.921483413), (-10.840157515, -3.062428502), (-10.459842485, -2.137571498), (-13.234413498, -0.996626409), align=None)
    extrude(amount=BOSS_EXTRUDE7_DEPTH)

    # Sketch23 → Boss-Extrude8 (add)
    with BuildSketch(Plane.XZ.offset(6.1).offset(BOSS_EXTRUDE8_START)):
        with Locations((1.05, 3.25)):
            Rectangle(SKETCH23_W, SKETCH23_H)
    extrude(amount=BOSS_EXTRUDE8_DEPTH)

    # Cut-Extrude12: up to this face of the body (flat: up to its plane)
    cut_extrude12_end = Plane(body_2.part.faces().sort_by_distance((6.62629189, 7.340799544, 7.4))[0])
    # Sketch24 → Cut-Extrude12 (cut, up to the picked face)
    with BuildSketch(Plane(origin=(0, 0, -13.4), x_dir=(-1, 0, 0), z_dir=(0, 0, -1)), mode=Mode.PRIVATE) as cut_extrude12_sk1:
        with Locations((-1.05, 7.2)):
            Circle(SKETCH24_R)
    cut_extrude12_tool1 = split(extrude(cut_extrude12_sk1.sketch, amount=-CUT_EXTRUDE12_REACH, mode=Mode.PRIVATE), bisect_by=cut_extrude12_end, keep=Keep.BOTH, mode=Mode.PRIVATE)
    # Sketch24 → Cut-Extrude12 (cut, up to the picked face)
    with BuildSketch(Plane(origin=(0, 0, -13.4), x_dir=(-1, 0, 0), z_dir=(0, 0, -1)), mode=Mode.PRIVATE) as cut_extrude12_sk2:
        with Locations((-1.05, -2.6)):
            Circle(SKETCH24_R)
    cut_extrude12_tool2 = split(extrude(cut_extrude12_sk2.sketch, amount=-CUT_EXTRUDE12_REACH, mode=Mode.PRIVATE), bisect_by=cut_extrude12_end, keep=Keep.BOTH, mode=Mode.PRIVATE)
    # Sketch24 → Cut-Extrude12 (cut, up to the picked face)
    with BuildSketch(Plane(origin=(0, 0, -13.4), x_dir=(-1, 0, 0), z_dir=(0, 0, -1)), mode=Mode.PRIVATE) as cut_extrude12_sk3:
        with Locations((-10.65, -2.6)):
            Circle(SKETCH24_R)
    cut_extrude12_tool3 = split(extrude(cut_extrude12_sk3.sketch, amount=-CUT_EXTRUDE12_REACH, mode=Mode.PRIVATE), bisect_by=cut_extrude12_end, keep=Keep.BOTH, mode=Mode.PRIVATE)
    add(cut_extrude12_tool1.solids().sort_by(Axis((1.05, 7.2, -13.4), (0, 0, 1)))[0], mode=Mode.SUBTRACT)
    add(cut_extrude12_tool2.solids().sort_by(Axis((1.05, -2.6, -13.4), (0, 0, 1)))[0], mode=Mode.SUBTRACT)
    add(cut_extrude12_tool3.solids().sort_by(Axis((10.65, -2.6, -13.4), (0, 0, 1)))[0], mode=Mode.SUBTRACT)

    # Sketch25 → Boss-Extrude9 (add)
    with BuildSketch(Plane.XY.offset(4.8)):
        with Locations(Location((1.05, -2.6, 0), (0, 0, 180))):
            Circle(SKETCH25_R)
    extrude(amount=-BOSS_EXTRUDE9_DEPTH)


solid = body_2.part
